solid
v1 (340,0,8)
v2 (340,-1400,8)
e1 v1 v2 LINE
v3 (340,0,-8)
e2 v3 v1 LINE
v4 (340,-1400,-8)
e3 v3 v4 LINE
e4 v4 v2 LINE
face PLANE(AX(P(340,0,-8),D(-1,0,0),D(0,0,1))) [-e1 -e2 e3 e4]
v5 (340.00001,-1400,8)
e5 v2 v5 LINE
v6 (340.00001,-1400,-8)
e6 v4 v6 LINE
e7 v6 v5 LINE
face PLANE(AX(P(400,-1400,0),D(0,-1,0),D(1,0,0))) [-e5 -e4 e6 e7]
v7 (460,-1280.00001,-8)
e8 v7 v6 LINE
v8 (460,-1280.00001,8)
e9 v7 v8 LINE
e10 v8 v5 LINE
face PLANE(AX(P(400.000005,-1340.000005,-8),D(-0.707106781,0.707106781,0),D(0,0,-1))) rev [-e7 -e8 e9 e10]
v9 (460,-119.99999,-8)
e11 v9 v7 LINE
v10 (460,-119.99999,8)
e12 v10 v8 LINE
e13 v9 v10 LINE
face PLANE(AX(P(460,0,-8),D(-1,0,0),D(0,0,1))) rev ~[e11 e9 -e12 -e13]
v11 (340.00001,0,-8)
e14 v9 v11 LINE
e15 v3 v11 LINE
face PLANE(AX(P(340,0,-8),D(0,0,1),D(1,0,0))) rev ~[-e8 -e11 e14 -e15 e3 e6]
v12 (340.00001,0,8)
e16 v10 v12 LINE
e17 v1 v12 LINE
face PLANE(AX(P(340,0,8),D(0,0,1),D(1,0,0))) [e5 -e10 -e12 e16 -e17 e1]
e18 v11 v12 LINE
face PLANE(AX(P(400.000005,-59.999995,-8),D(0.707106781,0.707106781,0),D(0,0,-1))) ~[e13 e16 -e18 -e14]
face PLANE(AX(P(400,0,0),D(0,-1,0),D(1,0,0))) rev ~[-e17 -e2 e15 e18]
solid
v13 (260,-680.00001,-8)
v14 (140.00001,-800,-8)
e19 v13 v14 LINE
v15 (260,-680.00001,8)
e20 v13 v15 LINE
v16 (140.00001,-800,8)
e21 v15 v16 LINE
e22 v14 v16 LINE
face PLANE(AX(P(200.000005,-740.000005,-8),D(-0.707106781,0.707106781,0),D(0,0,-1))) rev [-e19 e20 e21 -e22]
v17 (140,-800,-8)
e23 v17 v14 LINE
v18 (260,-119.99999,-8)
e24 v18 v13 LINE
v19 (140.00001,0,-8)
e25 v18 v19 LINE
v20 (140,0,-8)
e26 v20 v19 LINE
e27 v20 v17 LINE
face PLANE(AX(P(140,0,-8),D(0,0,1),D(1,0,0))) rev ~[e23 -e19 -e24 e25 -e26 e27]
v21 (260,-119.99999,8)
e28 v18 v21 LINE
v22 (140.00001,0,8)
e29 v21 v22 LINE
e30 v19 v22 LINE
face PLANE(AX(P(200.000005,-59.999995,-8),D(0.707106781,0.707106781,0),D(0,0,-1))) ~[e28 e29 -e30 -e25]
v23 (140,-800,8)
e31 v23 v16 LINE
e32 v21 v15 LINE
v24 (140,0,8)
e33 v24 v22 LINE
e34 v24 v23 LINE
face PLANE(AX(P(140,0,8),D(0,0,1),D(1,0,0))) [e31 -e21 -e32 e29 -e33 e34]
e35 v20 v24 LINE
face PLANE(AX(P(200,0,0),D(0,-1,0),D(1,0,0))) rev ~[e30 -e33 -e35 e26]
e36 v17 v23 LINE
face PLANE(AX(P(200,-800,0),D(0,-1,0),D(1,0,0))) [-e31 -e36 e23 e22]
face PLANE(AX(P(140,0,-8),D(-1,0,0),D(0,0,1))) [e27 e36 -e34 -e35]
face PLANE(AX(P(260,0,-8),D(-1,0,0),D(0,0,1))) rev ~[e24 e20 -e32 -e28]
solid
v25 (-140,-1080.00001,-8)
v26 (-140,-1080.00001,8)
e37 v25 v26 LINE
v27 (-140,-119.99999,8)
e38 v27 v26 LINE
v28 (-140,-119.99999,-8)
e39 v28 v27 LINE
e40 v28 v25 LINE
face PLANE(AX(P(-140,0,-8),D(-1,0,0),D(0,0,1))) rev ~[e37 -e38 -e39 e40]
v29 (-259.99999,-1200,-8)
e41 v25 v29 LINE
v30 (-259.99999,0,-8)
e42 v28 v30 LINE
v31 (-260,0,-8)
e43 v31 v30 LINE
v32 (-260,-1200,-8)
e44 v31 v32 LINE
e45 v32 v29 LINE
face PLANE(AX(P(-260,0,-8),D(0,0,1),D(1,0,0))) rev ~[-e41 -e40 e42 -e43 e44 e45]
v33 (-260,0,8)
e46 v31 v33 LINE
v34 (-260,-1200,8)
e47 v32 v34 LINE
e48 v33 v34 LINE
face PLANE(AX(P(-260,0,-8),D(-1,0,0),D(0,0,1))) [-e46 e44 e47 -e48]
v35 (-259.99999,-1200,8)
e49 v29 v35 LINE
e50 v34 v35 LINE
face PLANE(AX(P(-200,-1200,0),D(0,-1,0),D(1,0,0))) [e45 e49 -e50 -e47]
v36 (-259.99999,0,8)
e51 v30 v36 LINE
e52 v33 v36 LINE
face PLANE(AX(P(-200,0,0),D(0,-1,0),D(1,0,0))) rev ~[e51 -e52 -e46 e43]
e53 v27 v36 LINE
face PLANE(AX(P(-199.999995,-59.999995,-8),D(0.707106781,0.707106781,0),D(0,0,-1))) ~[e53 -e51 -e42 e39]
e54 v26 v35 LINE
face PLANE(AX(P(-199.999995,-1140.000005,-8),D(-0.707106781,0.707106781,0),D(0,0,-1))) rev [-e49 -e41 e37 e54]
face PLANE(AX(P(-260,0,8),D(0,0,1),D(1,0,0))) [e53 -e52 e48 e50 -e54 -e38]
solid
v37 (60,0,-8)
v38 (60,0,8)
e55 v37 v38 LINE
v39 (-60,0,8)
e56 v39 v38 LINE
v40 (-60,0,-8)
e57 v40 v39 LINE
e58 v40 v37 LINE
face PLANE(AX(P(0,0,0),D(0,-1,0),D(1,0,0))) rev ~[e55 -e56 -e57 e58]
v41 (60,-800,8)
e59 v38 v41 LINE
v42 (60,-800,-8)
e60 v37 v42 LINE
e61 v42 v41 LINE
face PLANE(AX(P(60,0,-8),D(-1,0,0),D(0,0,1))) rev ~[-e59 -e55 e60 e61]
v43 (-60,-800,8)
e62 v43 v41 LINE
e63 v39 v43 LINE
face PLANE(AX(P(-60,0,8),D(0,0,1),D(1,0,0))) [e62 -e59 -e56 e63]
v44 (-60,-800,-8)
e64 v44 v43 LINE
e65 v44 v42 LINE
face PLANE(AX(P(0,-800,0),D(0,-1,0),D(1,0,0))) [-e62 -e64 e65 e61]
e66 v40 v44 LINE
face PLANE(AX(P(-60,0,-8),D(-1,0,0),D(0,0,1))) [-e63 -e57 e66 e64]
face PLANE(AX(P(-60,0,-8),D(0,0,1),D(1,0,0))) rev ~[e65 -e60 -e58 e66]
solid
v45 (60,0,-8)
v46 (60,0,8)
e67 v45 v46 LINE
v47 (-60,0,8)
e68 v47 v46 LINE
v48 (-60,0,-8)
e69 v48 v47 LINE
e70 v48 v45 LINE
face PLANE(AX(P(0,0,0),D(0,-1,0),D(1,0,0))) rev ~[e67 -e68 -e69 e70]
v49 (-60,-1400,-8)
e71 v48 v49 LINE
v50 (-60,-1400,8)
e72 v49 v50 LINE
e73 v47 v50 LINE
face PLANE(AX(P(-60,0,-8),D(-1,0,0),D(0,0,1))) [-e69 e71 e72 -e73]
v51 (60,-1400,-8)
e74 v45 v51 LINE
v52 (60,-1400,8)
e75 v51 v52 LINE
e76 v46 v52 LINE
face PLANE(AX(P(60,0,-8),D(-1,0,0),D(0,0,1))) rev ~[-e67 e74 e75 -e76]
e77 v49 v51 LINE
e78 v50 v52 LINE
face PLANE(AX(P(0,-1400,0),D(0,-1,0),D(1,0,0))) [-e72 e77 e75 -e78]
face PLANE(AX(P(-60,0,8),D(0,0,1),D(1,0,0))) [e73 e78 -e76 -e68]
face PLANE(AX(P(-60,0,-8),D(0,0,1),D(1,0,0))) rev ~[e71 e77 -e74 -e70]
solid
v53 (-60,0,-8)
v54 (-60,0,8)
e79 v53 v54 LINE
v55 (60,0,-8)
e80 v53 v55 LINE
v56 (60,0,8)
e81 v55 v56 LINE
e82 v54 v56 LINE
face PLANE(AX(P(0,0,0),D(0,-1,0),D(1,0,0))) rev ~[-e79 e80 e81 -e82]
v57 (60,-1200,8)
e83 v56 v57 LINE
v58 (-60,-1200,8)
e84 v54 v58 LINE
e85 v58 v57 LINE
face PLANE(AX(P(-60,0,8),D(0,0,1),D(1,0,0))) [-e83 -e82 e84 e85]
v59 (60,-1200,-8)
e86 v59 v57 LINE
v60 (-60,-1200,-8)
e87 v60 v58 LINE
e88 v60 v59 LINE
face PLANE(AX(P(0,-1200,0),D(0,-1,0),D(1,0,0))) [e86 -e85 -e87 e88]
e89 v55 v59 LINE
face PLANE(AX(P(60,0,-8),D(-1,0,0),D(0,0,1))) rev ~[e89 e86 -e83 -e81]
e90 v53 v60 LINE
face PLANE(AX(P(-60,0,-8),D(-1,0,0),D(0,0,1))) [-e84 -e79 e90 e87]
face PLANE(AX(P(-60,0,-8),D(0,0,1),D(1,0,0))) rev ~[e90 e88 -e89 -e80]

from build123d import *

# Parameters (mm, degrees)
F0_W     = 120
F0_H     = 16
F1_DEPTH = 800
F2_DEPTH = 1200
F4_SIZE  = 119.99999
F6_SIZE  = 119.99999
F7_DEPTH = 1400
F9_SIZE  = 119.99999


# Not quite as in the source:
# - a fillet or chamfer is up to 0.001 mm smaller than in the source, because OpenCascade refuses the exact size


with BuildPart() as f1:
    # F0 (on Front) → F1 (new body)
    with BuildSketch(Plane.XZ):
        Rectangle(F0_W, F0_H)
    extrude(amount=F1_DEPTH)


with BuildPart() as f2:
    # F0 (on Front) → F2 (new body)
    with BuildSketch(Plane.XZ):
        Rectangle(F0_W, F0_H)
    extrude(amount=F2_DEPTH)


with BuildPart() as f3_1:
    # F3: copy of F1
    add(f1.part.moved(Location((200, 0, 0))))

    # F4 (size 120 in the source; OpenCascade refuses exactly that, so slightly less here)
    f4_edges = [f3_1.edges().sort_by_distance(p)[0] for p in [
        (260, -800, 0),
        (260, 0, 0),
    ]]
    chamfer(f4_edges, length=F4_SIZE)


with BuildPart() as f5_1:
    # F5: copy of F2
    add(f2.part.moved(Location((-200, 0, 0))))

    # F6 (size 120 in the source; OpenCascade refuses exactly that, so slightly less here)
    f6_edges = [f5_1.edges().sort_by_distance(p)[0] for p in [
        (-140, -1200, 0),
        (-140, 0, 0),
    ]]
    chamfer(f6_edges, length=F6_SIZE)


with BuildPart() as f7:
    # F0 (on Front) → F7 (new body)
    with BuildSketch(Plane.XZ):
        Rectangle(F0_W, F0_H)
    extrude(amount=F7_DEPTH)


with BuildPart() as f8_1:
    # F8: copy of F7
    add(f7.part.moved(Location((400, 0, 0))))

    # F9 (size 120 in the source; OpenCascade refuses exactly that, so slightly less here)
    f9_edges = [f8_1.edges().sort_by_distance(p)[0] for p in [
        (460, -1400, 0),
        (460, 0, 0),
    ]]
    chamfer(f9_edges, length=F9_SIZE)


solid = Compound([f1.part, f2.part, f3_1.part, f5_1.part, f7.part, f8_1.part])
